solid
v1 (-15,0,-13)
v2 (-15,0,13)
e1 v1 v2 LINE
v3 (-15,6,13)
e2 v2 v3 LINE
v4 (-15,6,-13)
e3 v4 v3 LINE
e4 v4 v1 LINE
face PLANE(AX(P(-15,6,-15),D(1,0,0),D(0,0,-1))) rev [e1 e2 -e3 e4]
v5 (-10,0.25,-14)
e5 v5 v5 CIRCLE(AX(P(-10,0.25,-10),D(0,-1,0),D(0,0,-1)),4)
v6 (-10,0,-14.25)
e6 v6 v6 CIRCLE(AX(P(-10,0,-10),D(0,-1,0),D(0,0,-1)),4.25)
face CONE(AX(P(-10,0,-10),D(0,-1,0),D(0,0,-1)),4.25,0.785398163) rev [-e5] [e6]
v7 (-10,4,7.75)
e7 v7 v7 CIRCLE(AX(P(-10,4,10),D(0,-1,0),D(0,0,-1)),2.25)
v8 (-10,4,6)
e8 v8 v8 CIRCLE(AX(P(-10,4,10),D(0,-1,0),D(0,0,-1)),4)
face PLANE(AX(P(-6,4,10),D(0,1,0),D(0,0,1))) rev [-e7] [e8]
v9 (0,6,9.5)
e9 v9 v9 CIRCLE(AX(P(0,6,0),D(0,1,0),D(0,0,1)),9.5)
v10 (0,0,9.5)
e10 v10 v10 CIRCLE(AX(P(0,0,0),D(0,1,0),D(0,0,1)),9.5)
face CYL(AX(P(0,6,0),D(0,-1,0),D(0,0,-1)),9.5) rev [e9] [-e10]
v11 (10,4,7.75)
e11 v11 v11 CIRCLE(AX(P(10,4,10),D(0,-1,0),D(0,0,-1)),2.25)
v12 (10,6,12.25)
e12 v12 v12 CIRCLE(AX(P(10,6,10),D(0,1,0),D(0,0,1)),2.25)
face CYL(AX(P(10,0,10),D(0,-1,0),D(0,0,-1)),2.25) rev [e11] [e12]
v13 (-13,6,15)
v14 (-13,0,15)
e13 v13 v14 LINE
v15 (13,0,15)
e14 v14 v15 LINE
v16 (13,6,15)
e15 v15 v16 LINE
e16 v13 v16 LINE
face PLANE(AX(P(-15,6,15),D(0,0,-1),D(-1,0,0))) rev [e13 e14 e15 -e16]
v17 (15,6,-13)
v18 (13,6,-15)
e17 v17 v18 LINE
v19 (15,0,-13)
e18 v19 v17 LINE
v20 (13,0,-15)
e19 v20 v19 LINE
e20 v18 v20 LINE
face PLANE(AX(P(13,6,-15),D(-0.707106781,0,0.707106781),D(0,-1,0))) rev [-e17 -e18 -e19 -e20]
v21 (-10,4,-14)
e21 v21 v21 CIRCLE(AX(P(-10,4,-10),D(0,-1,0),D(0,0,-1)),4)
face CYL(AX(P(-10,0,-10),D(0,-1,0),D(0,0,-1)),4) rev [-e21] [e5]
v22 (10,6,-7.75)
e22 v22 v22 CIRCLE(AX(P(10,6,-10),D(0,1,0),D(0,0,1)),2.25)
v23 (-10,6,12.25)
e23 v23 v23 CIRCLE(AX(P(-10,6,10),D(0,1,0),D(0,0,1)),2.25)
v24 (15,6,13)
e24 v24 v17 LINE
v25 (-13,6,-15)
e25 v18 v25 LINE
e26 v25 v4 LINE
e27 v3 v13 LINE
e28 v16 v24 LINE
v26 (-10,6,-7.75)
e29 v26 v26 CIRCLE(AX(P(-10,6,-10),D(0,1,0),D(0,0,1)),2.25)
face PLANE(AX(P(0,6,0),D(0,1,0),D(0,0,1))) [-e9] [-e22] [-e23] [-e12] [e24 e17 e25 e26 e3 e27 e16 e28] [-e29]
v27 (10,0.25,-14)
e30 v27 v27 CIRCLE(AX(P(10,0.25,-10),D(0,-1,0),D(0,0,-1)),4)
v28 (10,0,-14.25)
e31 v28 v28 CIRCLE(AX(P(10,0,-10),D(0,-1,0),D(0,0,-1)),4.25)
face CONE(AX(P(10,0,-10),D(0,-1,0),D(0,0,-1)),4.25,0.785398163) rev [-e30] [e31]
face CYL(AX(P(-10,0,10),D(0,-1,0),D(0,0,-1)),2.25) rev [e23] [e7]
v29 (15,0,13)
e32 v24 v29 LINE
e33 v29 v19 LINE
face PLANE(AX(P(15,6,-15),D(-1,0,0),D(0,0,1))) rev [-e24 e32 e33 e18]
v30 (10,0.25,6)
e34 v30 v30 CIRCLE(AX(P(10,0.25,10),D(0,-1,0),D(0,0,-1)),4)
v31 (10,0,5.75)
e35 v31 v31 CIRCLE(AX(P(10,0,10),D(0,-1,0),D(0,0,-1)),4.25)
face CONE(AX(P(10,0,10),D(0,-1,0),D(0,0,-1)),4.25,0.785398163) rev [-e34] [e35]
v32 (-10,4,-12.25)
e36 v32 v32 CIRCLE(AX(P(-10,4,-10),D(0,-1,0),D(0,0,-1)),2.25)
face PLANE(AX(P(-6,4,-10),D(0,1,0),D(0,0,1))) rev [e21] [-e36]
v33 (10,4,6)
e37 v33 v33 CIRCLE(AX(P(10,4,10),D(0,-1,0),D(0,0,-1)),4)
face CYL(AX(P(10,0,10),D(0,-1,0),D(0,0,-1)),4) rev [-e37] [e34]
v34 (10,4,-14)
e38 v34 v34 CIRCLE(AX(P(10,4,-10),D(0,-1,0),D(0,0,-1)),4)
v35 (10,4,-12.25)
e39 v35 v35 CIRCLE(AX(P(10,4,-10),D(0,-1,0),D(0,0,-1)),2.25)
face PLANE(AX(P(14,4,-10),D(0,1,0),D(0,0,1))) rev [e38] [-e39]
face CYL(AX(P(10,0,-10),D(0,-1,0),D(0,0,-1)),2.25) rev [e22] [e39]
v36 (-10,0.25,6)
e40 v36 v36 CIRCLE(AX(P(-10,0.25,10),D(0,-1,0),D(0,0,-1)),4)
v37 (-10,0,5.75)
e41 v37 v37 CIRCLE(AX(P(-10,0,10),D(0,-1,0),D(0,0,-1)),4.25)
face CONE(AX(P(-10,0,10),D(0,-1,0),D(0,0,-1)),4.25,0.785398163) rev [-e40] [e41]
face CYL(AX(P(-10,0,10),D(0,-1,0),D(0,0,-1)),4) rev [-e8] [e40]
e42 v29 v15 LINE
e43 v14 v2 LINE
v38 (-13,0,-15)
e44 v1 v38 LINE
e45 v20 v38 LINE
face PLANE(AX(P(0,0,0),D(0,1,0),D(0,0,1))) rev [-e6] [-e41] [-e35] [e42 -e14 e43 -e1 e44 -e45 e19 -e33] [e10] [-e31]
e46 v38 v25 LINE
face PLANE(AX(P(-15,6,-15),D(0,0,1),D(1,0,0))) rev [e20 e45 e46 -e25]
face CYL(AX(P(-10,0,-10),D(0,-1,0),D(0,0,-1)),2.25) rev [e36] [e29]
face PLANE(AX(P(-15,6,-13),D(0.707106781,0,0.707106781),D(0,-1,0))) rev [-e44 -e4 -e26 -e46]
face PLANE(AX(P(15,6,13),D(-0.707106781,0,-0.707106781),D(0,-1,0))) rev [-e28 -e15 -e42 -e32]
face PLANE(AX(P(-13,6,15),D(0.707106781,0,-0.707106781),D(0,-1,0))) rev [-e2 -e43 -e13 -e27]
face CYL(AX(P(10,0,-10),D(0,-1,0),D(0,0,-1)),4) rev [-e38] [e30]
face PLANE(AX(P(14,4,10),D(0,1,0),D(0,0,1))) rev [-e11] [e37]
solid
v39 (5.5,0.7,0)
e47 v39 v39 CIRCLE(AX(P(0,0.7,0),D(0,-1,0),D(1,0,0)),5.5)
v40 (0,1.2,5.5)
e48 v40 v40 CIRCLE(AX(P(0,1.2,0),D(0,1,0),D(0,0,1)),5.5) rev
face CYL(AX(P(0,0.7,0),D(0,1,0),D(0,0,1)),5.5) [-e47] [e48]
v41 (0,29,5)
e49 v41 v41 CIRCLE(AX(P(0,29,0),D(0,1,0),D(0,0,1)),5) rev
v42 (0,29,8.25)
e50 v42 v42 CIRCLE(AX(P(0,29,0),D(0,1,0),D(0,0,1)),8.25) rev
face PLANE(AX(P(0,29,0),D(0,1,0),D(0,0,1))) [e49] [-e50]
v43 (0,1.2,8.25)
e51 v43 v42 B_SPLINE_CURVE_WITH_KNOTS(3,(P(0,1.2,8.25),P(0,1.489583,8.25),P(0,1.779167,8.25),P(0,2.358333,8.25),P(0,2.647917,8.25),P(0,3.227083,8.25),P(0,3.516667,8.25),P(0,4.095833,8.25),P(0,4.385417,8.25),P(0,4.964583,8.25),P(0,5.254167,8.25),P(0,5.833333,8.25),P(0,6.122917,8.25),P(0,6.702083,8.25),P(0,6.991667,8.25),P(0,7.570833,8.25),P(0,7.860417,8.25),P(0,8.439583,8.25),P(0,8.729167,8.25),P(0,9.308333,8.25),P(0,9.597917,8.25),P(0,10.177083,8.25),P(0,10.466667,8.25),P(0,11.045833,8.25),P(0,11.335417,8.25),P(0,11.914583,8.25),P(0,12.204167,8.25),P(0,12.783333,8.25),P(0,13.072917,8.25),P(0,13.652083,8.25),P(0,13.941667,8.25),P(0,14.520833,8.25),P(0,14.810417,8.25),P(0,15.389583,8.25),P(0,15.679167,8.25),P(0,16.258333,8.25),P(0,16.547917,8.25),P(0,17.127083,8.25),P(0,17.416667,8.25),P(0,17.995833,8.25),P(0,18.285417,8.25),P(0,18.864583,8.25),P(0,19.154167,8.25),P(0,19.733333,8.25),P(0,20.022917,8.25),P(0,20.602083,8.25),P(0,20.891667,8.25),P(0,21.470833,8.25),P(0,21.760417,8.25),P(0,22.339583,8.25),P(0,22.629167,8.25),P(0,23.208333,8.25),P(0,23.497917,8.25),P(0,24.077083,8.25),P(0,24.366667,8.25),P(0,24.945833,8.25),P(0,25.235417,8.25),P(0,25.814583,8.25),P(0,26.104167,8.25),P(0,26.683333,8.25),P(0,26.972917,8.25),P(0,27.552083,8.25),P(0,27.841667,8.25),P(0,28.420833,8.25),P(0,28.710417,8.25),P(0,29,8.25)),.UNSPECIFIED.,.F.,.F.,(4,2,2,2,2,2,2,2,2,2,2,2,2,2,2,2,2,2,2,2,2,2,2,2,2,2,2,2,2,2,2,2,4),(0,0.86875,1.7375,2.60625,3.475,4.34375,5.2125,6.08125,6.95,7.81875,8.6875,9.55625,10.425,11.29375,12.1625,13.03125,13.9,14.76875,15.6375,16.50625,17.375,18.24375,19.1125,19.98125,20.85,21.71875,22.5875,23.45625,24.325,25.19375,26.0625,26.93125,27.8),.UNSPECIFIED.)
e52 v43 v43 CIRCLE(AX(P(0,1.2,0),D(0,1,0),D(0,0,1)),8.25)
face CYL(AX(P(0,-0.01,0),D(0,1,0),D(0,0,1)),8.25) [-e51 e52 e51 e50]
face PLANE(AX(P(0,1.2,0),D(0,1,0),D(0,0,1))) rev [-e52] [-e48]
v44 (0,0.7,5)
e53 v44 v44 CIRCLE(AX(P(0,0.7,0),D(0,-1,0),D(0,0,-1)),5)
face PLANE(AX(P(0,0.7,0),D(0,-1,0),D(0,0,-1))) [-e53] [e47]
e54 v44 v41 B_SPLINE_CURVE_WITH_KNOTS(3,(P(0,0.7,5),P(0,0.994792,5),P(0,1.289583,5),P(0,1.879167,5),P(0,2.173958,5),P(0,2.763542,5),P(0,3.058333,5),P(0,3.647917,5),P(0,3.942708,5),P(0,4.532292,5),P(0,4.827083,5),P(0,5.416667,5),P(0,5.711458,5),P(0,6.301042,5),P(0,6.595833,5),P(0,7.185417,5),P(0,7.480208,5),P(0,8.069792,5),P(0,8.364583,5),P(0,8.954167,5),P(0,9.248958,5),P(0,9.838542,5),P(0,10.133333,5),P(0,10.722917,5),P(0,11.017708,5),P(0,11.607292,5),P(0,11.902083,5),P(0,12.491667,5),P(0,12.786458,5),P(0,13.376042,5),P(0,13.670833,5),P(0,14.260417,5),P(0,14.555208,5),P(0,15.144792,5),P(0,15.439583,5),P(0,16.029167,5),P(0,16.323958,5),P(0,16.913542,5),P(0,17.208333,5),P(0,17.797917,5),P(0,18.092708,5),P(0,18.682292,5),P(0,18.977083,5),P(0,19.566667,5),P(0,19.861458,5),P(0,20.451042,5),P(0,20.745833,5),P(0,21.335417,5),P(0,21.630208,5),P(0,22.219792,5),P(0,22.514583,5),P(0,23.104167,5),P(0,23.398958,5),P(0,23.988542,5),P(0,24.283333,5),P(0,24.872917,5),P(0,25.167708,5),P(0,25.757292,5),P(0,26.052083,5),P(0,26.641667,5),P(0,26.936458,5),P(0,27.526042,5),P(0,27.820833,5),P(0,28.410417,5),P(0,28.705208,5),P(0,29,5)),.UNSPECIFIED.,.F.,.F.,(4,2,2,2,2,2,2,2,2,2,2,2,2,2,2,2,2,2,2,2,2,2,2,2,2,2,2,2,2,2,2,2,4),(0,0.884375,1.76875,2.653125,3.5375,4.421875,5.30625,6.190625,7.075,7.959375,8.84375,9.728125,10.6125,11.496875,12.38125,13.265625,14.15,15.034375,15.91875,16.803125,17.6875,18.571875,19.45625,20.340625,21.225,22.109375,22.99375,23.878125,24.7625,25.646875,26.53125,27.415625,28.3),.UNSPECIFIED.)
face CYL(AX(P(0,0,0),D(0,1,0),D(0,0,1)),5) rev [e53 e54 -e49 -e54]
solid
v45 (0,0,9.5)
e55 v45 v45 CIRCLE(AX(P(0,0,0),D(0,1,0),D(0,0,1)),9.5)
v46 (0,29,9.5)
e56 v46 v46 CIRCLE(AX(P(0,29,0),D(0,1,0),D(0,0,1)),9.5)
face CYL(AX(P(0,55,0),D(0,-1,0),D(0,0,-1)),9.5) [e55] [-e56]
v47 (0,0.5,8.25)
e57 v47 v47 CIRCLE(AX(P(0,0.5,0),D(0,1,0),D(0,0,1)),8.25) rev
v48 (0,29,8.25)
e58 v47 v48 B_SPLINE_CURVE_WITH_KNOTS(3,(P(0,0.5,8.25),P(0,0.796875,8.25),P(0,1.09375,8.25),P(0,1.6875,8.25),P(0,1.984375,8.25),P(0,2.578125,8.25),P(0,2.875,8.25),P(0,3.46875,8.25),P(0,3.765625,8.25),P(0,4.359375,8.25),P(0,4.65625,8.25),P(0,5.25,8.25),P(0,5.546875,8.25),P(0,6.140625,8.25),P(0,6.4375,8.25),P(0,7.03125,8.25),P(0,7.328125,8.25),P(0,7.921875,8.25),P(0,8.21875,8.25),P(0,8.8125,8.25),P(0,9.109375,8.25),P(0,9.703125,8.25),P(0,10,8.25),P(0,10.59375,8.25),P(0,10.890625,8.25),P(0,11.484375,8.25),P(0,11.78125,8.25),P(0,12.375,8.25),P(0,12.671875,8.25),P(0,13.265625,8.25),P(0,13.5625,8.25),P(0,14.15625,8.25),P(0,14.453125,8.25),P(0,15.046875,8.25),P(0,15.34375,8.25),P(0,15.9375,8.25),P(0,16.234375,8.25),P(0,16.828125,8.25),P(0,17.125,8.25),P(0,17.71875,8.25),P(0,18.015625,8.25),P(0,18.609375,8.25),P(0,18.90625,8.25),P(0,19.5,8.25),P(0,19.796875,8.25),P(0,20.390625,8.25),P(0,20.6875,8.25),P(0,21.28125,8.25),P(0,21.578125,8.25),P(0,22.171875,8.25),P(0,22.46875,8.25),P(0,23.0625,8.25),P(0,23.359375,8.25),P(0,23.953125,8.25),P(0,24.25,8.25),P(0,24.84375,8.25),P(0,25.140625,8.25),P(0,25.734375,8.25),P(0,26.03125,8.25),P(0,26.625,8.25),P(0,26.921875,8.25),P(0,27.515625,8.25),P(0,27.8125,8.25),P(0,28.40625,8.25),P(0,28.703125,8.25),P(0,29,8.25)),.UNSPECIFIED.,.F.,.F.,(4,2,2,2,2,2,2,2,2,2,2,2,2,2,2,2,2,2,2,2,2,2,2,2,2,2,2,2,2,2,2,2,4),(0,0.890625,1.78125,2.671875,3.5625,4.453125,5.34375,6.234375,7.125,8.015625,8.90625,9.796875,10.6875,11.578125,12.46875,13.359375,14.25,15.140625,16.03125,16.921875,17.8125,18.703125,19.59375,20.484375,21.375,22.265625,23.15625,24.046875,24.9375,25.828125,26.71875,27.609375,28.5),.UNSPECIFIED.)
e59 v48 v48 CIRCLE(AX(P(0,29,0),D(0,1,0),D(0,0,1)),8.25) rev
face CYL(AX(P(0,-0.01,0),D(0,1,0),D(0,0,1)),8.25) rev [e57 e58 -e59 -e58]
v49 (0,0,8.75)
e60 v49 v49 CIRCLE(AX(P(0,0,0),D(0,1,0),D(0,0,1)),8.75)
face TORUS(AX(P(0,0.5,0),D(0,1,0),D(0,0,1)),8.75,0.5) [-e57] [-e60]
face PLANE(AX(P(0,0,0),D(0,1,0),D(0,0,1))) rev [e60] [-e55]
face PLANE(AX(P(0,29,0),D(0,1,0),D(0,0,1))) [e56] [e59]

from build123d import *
from build123d.topology import SkipClean

# Parameters (mm, degrees)
SKETCH1_W                     = 30
SKETCH1_H                     = 30
SKETCH1_R                     = 9.5
BOSS_EXTRUDE1_DEPTH           = 6
SKETCH1_2_R                   = 9.5
BOSS_EXTRUDE3_DEPTH           = 55
SPLIT1_OUTLINE_R              = 9.5
SPLIT1_OUTLINE_R_2            = 8.25
SPLIT1_DEPTH                  = 55
SPLIT1_2_OUTLINE_R            = 9.5
SPLIT1_2_OUTLINE_R_2          = 8.25
SPLIT1_2_DEPTH                = 55
MOVE_START                    = 53.8
MOVE_FACE1_OUTLINE_R          = 8.25
MOVE_FACE1_DEPTH              = 1.2
MOVE_FACE2_OUTLINE_R          = 8.25
MOVE_FACE2_DEPTH              = 1.2
SKETCH5_R                     = 5
CUT_EXTRUDE1_DEPTH            = 58.831133484
SKETCH6_R                     = 5.5
SKETCH6_R_2                   = 5
EXTRUDE_THIN1_DEPTH           = 0.5
SKETCH7_R                     = 5.5
SKETCH7_R_2                   = 5
EXTRUDE_THIN2_DEPTH           = 0.5
FILLET1_R                     = 0.5
CBORE_FOR_M4_SHCS1_AT_2_COUNT = 2
CBORE_FOR_M4_SHCS1_AT_2_PITCH = 20
CBORE_FOR_M4_SHCS1_AT_3_COUNT = 2
CBORE_FOR_M4_SHCS1_AT_3_PITCH = 28.284271247
CBORE_FOR_M4_SHCS1_AT_4_COUNT = 2
CBORE_FOR_M4_SHCS1_AT_4_PITCH = 20
CHAMFER1_SIZE                 = 2
CUT_EXTRUDE2_DEPTH            = 10
CUT_EXTRUDE2_DEPTH_BACK       = 24.8
SKETCH11_R                    = 15.315618243


# Read off the part's stored shape, not the designer's step: Split1, Move Face1, Move Face2
with BuildPart() as part:
    # Sketch1 → Boss-Extrude1 (new body)
    with BuildSketch(Plane(origin=(0, 0, 0), x_dir=(1, 0, 0), z_dir=(0, 1, 0))):
        Rectangle(SKETCH1_W, SKETCH1_H)
        with Locations(Location((0, 0, 0), (0, 0, 270))):
            Circle(SKETCH1_R, mode=Mode.SUBTRACT)
    extrude(amount=BOSS_EXTRUDE1_DEPTH)

    # Sketch10 → CBORE for M4 SHCS1 (revolve, cut)
    with BuildSketch(Plane(origin=(10, 0, 10), x_dir=(0, 0, -1), z_dir=(1, 0, 0))):
        Polygon((0, 0), (0, 6.001), (2.25, 6.001), (2.25, 4), (4, 4), (4, 0.25), (4.25, 0), align=None)
    cbore_for_m4_shcs1 = revolve(axis=Axis((10, -6.35, 10), (0, 1, 0)), mode=Mode.SUBTRACT)

    # CBORE for M4 SHCS1 at 2: CBORE for M4 SHCS1 ×2
    with Locations(*[(0, 0, -i * CBORE_FOR_M4_SHCS1_AT_2_PITCH) for i in range(1, CBORE_FOR_M4_SHCS1_AT_2_COUNT)]):
        add(cbore_for_m4_shcs1, mode=Mode.SUBTRACT)

    # CBORE for M4 SHCS1 at 3: CBORE for M4 SHCS1 ×2
    with Locations(*[Vector(-0.7071067811865476, 0, -0.7071067811865476) * (i * CBORE_FOR_M4_SHCS1_AT_3_PITCH) for i in range(1, CBORE_FOR_M4_SHCS1_AT_3_COUNT)]):
        add(cbore_for_m4_shcs1, mode=Mode.SUBTRACT)

    # CBORE for M4 SHCS1 at 4: CBORE for M4 SHCS1 ×2
    with Locations(*[(-i * CBORE_FOR_M4_SHCS1_AT_4_PITCH, 0, 0) for i in range(1, CBORE_FOR_M4_SHCS1_AT_4_COUNT)]):
        add(cbore_for_m4_shcs1, mode=Mode.SUBTRACT)

    # Chamfer1
    chamfer1_edges = [part.edges().sort_by_distance(p)[0] for p in [
        (15, 3, 15),
        (-15, 3, 15),
        (-15, 3, -15),
        (15, 3, -15),
    ]]
    chamfer(chamfer1_edges, length=CHAMFER1_SIZE)


with BuildPart() as body_2:
    # Sketch1<2> → Boss-Extrude3 (new body)
    with BuildSketch(Plane(origin=(0, 0, 0), x_dir=(1, 0, 0), z_dir=(0, 1, 0))):
        with Locations(Location((0, 0, 0), (0, 0, 270))):
            Circle(SKETCH1_2_R)
    extrude(amount=BOSS_EXTRUDE3_DEPTH)

    # Split1 outline → Split1 (cut)
    with BuildSketch(Plane(origin=(0, 0, 0), x_dir=(1, 0, 0), z_dir=(0, 1, 0))):
        Circle(SPLIT1_OUTLINE_R)
        Circle(SPLIT1_OUTLINE_R_2, mode=Mode.SUBTRACT)
    extrude(amount=SPLIT1_DEPTH, mode=Mode.SUBTRACT)

    # Move Face1 outline → Move Face1 (cut)
    with BuildSketch(Plane(origin=(0, 0, 0), x_dir=(1, 0, 0), z_dir=(0, 1, 0)).offset(MOVE_START)):
        Circle(MOVE_FACE1_OUTLINE_R)
    extrude(amount=MOVE_FACE1_DEPTH, mode=Mode.SUBTRACT)

    # Move Face2 outline → Move Face2 (cut)
    with BuildSketch(Plane(origin=(0, 0, 0), x_dir=(1, 0, 0), z_dir=(0, 1, 0))):
        Circle(MOVE_FACE2_OUTLINE_R)
    extrude(amount=MOVE_FACE2_DEPTH, mode=Mode.SUBTRACT)

    # Sketch5 → Cut-Extrude1 (cut, through all)
    with BuildSketch(Plane(origin=(0, 53.8, 0), x_dir=(1, 0, 0), z_dir=(0, 1, 0))):
        with Locations(Location((0, 0, 0), (0, 0, 270))):
            Circle(SKETCH5_R)
    extrude(amount=-CUT_EXTRUDE1_DEPTH, mode=Mode.SUBTRACT)

    # Sketch6 → Extrude-Thin1 (add)
    with BuildSketch(Plane(origin=(0, 53.8, 0), x_dir=(1, 0, 0), z_dir=(0, 1, 0))):
        Circle(SKETCH6_R)
        Circle(SKETCH6_R_2, mode=Mode.SUBTRACT)
    extrude(amount=EXTRUDE_THIN1_DEPTH)

    # Sketch7 → Extrude-Thin2 (add)
    with SkipClean():  # the faces are left unmerged after this step: merging them gives an invalid solid
        with BuildSketch(Plane.XZ.offset(-1.2)):
            Circle(SKETCH7_R)
            Circle(SKETCH7_R_2, mode=Mode.SUBTRACT)
        extrude(amount=EXTRUDE_THIN2_DEPTH)


with BuildPart() as body_3:
    # Split1 2 outline → Split1 2 (new body)
    with BuildSketch(Plane(origin=(0, 0, 0), x_dir=(1, 0, 0), z_dir=(0, 1, 0))):
        Circle(SPLIT1_2_OUTLINE_R)
        Circle(SPLIT1_2_OUTLINE_R_2, mode=Mode.SUBTRACT)
    extrude(amount=SPLIT1_2_DEPTH)

    # Fillet1
    fillet1_edges = [body_3.edges().sort_by_distance(p)[0] for p in [
        (-8.25, 55, 0),
        (-9.5, 55, 0),
        (-8.25, 0, 0),
    ]]
    fillet(fillet1_edges, radius=FILLET1_R)


with BuildPart() as cut_extrude2_tool:
    # Sketch11 → Cut-Extrude2 (new, two sides: drawn at the far end of the back side and taken through both)
    with BuildSketch(Plane(origin=(0, 53.8, 0), x_dir=(1, 0, 0), z_dir=(0, 1, 0)).offset(-CUT_EXTRUDE2_DEPTH_BACK)):
        Circle(SKETCH11_R)
    extrude(amount=CUT_EXTRUDE2_DEPTH + CUT_EXTRUDE2_DEPTH_BACK)


with BuildPart() as body_2_1:
    add(body_2.part)

    # Cut-Extrude2: cut by cut_extrude2_tool
    add(cut_extrude2_tool.part, mode=Mode.SUBTRACT)


with BuildPart() as body_3_1:
    add(body_3.part)

    # Cut-Extrude2: cut by cut_extrude2_tool
    add(cut_extrude2_tool.part, mode=Mode.SUBTRACT)


solid = Compound([part.part, body_2_1.part, body_3_1.part])
